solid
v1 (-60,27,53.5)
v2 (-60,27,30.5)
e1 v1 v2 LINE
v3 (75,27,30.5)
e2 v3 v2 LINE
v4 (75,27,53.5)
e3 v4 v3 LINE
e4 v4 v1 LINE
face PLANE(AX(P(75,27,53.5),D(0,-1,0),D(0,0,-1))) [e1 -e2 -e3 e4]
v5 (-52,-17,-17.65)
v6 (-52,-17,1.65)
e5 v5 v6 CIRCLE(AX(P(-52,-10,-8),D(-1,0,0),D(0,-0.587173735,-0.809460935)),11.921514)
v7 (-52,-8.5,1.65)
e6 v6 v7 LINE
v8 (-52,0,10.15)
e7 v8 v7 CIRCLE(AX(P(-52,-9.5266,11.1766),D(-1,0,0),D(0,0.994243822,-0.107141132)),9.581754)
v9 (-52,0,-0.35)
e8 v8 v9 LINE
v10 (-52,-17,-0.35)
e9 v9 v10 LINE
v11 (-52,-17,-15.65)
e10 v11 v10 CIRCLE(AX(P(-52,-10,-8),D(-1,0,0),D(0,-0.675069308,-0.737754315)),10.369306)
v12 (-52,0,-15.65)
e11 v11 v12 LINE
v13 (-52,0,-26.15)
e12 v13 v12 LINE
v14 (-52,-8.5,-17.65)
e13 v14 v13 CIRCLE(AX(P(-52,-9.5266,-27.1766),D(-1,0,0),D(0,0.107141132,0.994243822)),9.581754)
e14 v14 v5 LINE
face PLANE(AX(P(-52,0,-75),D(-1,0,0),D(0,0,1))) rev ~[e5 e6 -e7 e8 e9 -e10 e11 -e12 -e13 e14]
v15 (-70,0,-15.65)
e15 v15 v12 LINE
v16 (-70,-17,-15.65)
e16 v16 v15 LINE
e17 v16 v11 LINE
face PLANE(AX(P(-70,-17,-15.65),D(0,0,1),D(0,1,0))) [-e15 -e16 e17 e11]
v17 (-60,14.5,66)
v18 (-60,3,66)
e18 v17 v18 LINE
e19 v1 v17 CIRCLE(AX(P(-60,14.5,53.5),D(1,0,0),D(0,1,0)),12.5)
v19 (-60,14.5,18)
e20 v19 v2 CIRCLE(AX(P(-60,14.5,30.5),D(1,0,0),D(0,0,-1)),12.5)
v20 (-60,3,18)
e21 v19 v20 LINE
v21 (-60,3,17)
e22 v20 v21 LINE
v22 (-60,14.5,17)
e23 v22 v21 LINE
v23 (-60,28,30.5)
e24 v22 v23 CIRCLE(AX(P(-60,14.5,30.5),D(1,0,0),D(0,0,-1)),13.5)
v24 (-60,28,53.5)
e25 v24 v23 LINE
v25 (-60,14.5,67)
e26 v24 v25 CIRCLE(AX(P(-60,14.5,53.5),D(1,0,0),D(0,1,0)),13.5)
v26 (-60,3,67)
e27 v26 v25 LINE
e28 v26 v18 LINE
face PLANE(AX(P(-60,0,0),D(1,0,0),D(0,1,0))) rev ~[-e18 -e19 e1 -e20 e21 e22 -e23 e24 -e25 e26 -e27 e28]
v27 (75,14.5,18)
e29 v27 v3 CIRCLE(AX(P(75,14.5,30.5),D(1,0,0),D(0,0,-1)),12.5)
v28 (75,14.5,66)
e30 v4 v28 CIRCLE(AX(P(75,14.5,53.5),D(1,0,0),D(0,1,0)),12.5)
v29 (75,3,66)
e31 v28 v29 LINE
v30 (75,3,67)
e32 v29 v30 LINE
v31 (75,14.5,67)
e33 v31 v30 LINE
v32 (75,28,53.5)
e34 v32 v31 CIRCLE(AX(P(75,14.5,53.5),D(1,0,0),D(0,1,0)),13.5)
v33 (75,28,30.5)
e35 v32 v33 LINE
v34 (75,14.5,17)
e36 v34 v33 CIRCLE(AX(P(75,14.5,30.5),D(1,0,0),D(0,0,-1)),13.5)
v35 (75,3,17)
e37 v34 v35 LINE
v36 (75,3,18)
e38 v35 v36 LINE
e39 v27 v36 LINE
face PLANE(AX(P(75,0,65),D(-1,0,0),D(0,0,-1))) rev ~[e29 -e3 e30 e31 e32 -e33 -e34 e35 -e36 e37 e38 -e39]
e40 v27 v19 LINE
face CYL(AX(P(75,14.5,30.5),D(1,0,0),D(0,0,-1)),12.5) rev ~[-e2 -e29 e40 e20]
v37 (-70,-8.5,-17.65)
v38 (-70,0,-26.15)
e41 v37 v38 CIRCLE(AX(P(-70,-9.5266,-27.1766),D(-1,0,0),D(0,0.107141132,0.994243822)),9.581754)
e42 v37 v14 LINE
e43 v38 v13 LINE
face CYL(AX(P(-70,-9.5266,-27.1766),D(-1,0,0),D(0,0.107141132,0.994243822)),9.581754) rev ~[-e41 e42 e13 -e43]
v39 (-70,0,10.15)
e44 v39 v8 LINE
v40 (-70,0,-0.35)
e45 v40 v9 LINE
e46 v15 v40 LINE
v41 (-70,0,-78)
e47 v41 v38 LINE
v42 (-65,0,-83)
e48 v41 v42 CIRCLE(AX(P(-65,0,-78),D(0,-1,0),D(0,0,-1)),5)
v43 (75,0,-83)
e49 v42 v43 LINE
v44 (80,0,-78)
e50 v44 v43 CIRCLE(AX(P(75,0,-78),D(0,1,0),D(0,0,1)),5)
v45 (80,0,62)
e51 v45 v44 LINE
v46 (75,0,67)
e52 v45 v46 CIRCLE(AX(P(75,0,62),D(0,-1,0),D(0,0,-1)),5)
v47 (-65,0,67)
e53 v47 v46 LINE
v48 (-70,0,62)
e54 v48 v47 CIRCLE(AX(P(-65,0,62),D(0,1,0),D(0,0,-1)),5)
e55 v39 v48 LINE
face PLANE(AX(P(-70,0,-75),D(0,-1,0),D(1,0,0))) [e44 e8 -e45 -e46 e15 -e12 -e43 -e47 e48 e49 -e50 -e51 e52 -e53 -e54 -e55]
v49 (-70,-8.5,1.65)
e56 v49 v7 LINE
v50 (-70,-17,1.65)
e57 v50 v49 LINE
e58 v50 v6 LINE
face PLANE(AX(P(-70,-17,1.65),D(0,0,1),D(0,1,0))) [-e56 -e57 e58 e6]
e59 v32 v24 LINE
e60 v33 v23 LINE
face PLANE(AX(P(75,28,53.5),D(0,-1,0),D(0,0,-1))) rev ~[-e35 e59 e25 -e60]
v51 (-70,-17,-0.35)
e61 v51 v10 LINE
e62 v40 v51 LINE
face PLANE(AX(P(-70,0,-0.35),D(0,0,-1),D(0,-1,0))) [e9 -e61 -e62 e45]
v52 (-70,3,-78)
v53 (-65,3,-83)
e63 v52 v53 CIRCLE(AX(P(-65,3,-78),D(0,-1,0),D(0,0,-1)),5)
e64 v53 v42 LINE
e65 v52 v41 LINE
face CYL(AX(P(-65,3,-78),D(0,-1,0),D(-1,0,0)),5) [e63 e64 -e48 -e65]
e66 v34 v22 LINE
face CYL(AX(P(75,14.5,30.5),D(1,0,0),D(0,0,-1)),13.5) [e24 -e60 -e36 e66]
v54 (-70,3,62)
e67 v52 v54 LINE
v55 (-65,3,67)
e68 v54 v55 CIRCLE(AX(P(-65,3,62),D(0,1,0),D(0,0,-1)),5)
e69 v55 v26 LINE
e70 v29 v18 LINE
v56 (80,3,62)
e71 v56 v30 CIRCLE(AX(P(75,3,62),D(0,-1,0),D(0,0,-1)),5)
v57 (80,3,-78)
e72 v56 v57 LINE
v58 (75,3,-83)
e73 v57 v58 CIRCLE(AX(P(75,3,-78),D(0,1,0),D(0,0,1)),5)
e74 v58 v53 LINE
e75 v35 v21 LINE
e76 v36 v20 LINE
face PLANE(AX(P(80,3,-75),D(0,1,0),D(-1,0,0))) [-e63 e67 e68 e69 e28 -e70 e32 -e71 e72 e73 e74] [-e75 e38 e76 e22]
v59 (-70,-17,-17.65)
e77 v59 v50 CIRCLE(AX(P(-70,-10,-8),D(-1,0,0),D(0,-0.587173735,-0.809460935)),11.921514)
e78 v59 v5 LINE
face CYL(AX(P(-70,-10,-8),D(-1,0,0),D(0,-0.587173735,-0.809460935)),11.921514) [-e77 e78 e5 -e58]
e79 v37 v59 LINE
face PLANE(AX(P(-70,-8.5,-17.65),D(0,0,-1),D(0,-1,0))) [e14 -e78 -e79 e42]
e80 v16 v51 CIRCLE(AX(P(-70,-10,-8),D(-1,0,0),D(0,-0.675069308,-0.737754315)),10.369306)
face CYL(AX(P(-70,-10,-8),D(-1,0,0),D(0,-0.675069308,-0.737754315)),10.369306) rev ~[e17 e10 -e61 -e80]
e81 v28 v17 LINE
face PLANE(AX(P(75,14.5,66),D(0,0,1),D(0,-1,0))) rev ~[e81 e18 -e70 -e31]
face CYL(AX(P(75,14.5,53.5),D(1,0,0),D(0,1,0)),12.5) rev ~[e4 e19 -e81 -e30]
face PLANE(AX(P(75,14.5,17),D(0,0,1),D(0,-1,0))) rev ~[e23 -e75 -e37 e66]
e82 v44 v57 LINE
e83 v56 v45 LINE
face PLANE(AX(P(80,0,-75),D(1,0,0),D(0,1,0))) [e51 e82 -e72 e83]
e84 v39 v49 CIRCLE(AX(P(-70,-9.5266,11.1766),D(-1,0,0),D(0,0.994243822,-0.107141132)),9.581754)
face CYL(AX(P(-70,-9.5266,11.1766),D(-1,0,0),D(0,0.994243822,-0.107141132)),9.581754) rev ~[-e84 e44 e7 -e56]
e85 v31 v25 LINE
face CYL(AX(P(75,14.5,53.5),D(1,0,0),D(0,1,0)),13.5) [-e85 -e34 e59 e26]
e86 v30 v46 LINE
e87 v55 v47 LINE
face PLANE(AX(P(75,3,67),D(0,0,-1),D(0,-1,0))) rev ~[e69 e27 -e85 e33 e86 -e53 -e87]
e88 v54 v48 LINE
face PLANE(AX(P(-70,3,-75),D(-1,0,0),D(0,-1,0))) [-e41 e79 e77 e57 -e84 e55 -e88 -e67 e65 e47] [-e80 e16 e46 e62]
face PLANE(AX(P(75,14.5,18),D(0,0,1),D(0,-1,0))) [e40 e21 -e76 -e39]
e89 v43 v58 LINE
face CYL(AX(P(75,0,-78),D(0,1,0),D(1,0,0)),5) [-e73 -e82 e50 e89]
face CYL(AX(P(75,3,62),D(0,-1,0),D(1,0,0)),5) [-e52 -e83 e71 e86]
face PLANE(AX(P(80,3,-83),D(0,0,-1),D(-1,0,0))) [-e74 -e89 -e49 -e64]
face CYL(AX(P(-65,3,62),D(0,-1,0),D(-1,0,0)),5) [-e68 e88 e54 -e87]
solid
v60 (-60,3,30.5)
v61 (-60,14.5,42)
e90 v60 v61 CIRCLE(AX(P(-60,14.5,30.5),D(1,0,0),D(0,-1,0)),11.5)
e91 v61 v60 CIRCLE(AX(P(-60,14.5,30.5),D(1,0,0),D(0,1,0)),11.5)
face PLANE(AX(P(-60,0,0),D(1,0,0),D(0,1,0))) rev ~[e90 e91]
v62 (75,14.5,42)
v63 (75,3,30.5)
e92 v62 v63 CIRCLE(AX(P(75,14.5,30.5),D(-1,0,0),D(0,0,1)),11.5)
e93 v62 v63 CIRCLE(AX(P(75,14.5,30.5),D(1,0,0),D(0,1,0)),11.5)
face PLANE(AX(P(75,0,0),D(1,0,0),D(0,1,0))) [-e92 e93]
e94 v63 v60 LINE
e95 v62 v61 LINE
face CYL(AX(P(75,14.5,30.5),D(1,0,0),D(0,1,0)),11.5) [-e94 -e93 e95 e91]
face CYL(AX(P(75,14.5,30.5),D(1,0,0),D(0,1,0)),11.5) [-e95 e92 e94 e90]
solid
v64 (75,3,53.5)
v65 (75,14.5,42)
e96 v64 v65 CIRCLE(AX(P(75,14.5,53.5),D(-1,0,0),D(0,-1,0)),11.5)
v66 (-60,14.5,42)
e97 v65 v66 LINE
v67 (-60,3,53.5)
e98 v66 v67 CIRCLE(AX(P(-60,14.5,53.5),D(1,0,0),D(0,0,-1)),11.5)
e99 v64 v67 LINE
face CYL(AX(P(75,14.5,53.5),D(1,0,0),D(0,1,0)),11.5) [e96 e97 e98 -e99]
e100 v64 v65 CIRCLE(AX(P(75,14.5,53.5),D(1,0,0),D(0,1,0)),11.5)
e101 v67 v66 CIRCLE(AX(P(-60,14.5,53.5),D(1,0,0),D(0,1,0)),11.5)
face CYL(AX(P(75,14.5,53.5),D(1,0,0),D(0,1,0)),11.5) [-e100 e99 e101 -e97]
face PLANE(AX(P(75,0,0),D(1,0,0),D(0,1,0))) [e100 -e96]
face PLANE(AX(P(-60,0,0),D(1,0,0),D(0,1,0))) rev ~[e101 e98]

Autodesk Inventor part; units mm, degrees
sketch "Sketch1" plane through (0, 0, 0) normal (0, 1, 0) x (-1, 0, 0)
  line L0 (0, 0) -> (75, 0)
  line L1 (0, 0) -> (-75, 0)
  line L2 (75, 0) -> (75, 75)
  line L3 (75, 75) -> (-75, 75)
  line L4 (-75, 75) -> (-75, 0)
  line L5 (-75, 0) -> (-75, -75)
  line L6 (-75, -75) -> (75, -75)
  line L7 (75, -69.5548) -> (75, 0)
  line L8 (75, -75) -> (75, -69.5548)
  line L9 (-75, 75) -> (-75, 65)
  dimension "d4" = 10
extrude "Extrusion1" add sketch "Sketch1" along normal blind 3
ref_plane "Work Plane1" through (75, 0, 0) normal (1, 0, 0) x (0, 1, 0)
sketch "Sketch3" plane through (75, 0, 0) normal (1, 0, 0) x (0, 1, 0)
  line L0 (3, 75) -> (3, 65)
  line L1 (3, 75) -> (3, -75) projected
  line L2 (3, 65) -> (3, 53.5)
  line L3 (3, 53.5) -> (14.5, 53.5)
  circle A0 centre (14.5, 53.5) radius 11.5
  line L4 (3, 53.5) -> (3, 30.5)
  line L5 (3, 30.5) -> (14.5, 30.5)
  circle A1 centre (14.5, 30.5) radius 11.5
  point P0 (0, 0)
  dimension "d12" = 10
  dimension "d13" = 11.5
  dimension "d14" = 11.5
  dimension "d15" = 23
extrude "Extrusion2" add sketch "Sketch3" against normal blind 135 contours A0 | A1
sketch "Sketch4" plane through (0, 3, 0) normal (0, 1, 0) x (1, 0, 0)
  point P0 (0, 0)
sketch "Sketch5" plane through (0, 3, 0) normal (0, 1, 0) x (1, 0, 0)
  point P0 (0, 0)
sketch "Sketch6" plane through (75, 0, 0) normal (1, 0, 0) x (0, 1, 0)
  arc A0 (14.5, 42) -> (3, 53.5) centre (14.5, 53.5) ccw projected
  line L0 (3, 75) -> (3, 53.5) projected
  arc A1 (3, 30.5) -> (14.5, 42) centre (14.5, 30.5) ccw projected
  line L1 (3, 30.5) -> (3, -75) projected
  line L2 (14.5, 66) -> (3, 66)
  line L3 (14.5, 18) -> (3, 18)
  arc A2 (27, 53.5) -> (14.5, 66) centre (14.5, 53.5) ccw
  line L4 (27, 53.5) -> (27, 30.5)
  arc A3 (14.5, 18) -> (27, 30.5) centre (14.5, 30.5) ccw
  line L5 (3, 66) -> (3, 67)
  line L6 (3, 67) -> (14.5, 67)
  arc A4 (28, 53.5) -> (14.5, 67) centre (14.5, 53.5) ccw
  line L7 (28, 53.5) -> (28, 30.5)
  arc A5 (14.5, 17) -> (28, 30.5) centre (14.5, 30.5) ccw
  line L8 (14.5, 17) -> (3, 17)
  line L9 (3, 67) -> (3, 66)
  line L10 (3, 18) -> (3, 17)
  point P0 (0, 0)
  dimension "d20" = 12.5
  dimension "d21" = 1
extrude "Extrusion3" add sketch "Sketch6" against normal blind 135 contours L0 L6 A4 L7 A5 L8 L1 L3 A3 L4 A2 L2
ref_plane "Work Plane2" through (-75, 0, 75) normal (0, 0, 1) x (1, 0, 0)
sketch "Sketch8" plane through (-75, 0, 75) normal (0, 0, 1) x (1, 0, 0)
  line L0 (0, 3) -> (150, 3)
  line L1 (150, 3) -> (150, 0)
  line L2 (150, 0) -> (0, 0)
  line L3 (0, 0) -> (0, 3)
  point P0 (75, 0)
extrude "Extrusion5" cut sketch "Sketch8" against normal blind 8
ref_plane "Work Plane3" through (-75, 0, -75) normal (-1, 0, 0) x (0, 0, 1)
sketch "Sketch9" plane through (-75, 0, -75) normal (-1, 0, 0) x (0, 0, 1)
  line L0 (0, 3.2367) -> (142, 3.2367)
  line L1 (142, 3.2367) -> (142, 0)
  line L2 (142, 0) -> (0, 0)
  line L3 (0, 0) -> (0, 3.2367)
  point P0 (75, 0)
extrude "Extrusion6" cut sketch "Sketch9" against normal blind 5
sketch "Sketch10" plane through (75, 0, 0) normal (1, 0, 0) x (0, 1, 0)
  line L0 (3, 67) -> (0, 67)
  line L1 (0, 67) -> (0, -82.8799)
  line L2 (0, -82.8799) -> (3, -82.8799)
  line L3 (3, -82.8799) -> (3, 67)
  point P0 (0, 0)
extrude "Extrusion7" add sketch "Sketch10" along normal blind 5
ref_plane "Work Plane4" through (75, 0, 0) normal (-1, 0, 0) x (0, 0, 1)
sketch "Sketch11" plane through (75, 0, 0) normal (-1, 0, 0) x (0, 0, 1)
  line L0 (-75, 3) -> (-82.8799, 3)
  line L1 (-82.8799, 3) -> (-82.8799, 0)
  line L2 (-82.8799, 0) -> (-75, 0)
  line L3 (-75, 0) -> (-75, 3)
  point P0 (0, 0)
extrude "Extrusion8" cut sketch "Sketch11" against normal blind 5
sketch "Sketch12" plane through (80, 3, -75) normal (0, 0, -1) x (-1, 0, 0)
  line L0 (0, 0) -> (150, 0)
  line L1 (150, 0) -> (150, -3)
  line L2 (150, -3) -> (0, -3)
  line L3 (0, -3) -> (0, 0)
  point P0 (80, -3)
extrude "Extrusion9" add sketch "Sketch12" along normal blind 8
fillet "Fillet1" radius 5 1 edges at (80, 1.5, 67)
fillet "Fillet2" radius 5 1 edges at (80, 1.5, -83)
fillet "Fillet3" radius 5 1 edges at (-70, 1.5, 67)
fillet "Fillet4" radius 5 1 edges at (-70, 1.5, -83)
sketch "Sketch13" plane through (0, 0, 0) normal (0, -1, 0) x (1, 0, 0)
  line L0 (80, 62) -> (80, -78)
  arc A0 (75, -83) -> (80, -78) centre (75, -78) ccw projected
  line L1 (80, -78) -> (80, -8)
  line L2 (80, -8) -> (-70, -8)
  line L3 (-70, 62) -> (-70, -78) projected
  line L4 (-70, -8) -> (-70, -78)
  line L5 (-70, -78) -> (-70, -8)
  line L6 (-70, 62) -> (-70, -8)
  line L7 (-70, -8) -> (5, -8)
  line L8 (5, -8) -> (5, 67)
  line L9 (75, 67) -> (-65, 67) projected
  line L10 (5, -8) -> (5, -83)
  point P0 (0, 0)
  dimension "d47" = 75
ref_plane "Work Plane5" through (-70, 0, -75) normal (-1, 0, 0) x (0, 0, 1)
sketch "Sketch14" plane through (-70, 0, -75) normal (-1, 0, 0) x (0, 0, 1)
  line L0 (137, 3) -> (-3, 3) projected
  line L1 (137, 0) -> (-3, 0) projected
  line L2 (67, 0) -> (67, 3)
  arc A0 (74.2639, 3) -> (75, 3) centre (74.6319, 3) ccw
  line L3 (67, 0) -> (59.35, 0)
  line L4 (67, 0) -> (74.65, 0)
  line L5 (74.65, 0) -> (74.65, -17)
  arc A1 (59.35, -17) -> (74.65, -17) centre (67, -10) ccw
  line L6 (74.65, -17) -> (74.65, 0)
  line L7 (59.35, -17) -> (59.35, 0)
  line L8 (59.35, 0) -> (74.65, 0)
  line L9 (74.65, -17) -> (74.65, 0)
  line L10 (59.1282, 0) -> (57.1283, 0)
  line L11 (59.35, 0) -> (57.35, 0)
  line L12 (57.35, -17) -> (59.35, -17)
  line L13 (74.65, 0) -> (76.65, 0)
  line L14 (76.65, -17) -> (74.65, -17)
  arc A2 (57.35, -17) -> (76.65, -17) centre (67, -10) ccw
  line L15 (74.65, 0) -> (74.65, -17)
  line L16 (76.65, 0) -> (85.15, 0)
  arc A3 (85.15, 0) -> (76.65, -8.5) centre (86.1766, -9.5266) ccw
  arc A4 (57.35, -8.5) -> (48.85, 0) centre (47.8234, -9.5266) ccw
  line L17 (57.35, -8.5) -> (57.35, -17)
  line L18 (76.65, -17) -> (76.65, -8.5)
  line L19 (48.85, 0) -> (59.35, 0)
  line L20 (74.65, 0) -> (85.15, 0)
  line L21 (74.65, 0) -> (74.65, -17)
  point P0 (75, 0)
  dimension "d49" = 7.65
  dimension "d50" = 7.65
  dimension "d52" = 17
  dimension "d53" = 2
  dimension "d54" = 2
  dimension "d55" = 8.5
extrude "Extrusion10" add sketch "Sketch14" against normal blind 18 contours A3 L18 L14 L5 L1 | A2 L12 A1 L14 | L17 A4 L1 L7 L12
